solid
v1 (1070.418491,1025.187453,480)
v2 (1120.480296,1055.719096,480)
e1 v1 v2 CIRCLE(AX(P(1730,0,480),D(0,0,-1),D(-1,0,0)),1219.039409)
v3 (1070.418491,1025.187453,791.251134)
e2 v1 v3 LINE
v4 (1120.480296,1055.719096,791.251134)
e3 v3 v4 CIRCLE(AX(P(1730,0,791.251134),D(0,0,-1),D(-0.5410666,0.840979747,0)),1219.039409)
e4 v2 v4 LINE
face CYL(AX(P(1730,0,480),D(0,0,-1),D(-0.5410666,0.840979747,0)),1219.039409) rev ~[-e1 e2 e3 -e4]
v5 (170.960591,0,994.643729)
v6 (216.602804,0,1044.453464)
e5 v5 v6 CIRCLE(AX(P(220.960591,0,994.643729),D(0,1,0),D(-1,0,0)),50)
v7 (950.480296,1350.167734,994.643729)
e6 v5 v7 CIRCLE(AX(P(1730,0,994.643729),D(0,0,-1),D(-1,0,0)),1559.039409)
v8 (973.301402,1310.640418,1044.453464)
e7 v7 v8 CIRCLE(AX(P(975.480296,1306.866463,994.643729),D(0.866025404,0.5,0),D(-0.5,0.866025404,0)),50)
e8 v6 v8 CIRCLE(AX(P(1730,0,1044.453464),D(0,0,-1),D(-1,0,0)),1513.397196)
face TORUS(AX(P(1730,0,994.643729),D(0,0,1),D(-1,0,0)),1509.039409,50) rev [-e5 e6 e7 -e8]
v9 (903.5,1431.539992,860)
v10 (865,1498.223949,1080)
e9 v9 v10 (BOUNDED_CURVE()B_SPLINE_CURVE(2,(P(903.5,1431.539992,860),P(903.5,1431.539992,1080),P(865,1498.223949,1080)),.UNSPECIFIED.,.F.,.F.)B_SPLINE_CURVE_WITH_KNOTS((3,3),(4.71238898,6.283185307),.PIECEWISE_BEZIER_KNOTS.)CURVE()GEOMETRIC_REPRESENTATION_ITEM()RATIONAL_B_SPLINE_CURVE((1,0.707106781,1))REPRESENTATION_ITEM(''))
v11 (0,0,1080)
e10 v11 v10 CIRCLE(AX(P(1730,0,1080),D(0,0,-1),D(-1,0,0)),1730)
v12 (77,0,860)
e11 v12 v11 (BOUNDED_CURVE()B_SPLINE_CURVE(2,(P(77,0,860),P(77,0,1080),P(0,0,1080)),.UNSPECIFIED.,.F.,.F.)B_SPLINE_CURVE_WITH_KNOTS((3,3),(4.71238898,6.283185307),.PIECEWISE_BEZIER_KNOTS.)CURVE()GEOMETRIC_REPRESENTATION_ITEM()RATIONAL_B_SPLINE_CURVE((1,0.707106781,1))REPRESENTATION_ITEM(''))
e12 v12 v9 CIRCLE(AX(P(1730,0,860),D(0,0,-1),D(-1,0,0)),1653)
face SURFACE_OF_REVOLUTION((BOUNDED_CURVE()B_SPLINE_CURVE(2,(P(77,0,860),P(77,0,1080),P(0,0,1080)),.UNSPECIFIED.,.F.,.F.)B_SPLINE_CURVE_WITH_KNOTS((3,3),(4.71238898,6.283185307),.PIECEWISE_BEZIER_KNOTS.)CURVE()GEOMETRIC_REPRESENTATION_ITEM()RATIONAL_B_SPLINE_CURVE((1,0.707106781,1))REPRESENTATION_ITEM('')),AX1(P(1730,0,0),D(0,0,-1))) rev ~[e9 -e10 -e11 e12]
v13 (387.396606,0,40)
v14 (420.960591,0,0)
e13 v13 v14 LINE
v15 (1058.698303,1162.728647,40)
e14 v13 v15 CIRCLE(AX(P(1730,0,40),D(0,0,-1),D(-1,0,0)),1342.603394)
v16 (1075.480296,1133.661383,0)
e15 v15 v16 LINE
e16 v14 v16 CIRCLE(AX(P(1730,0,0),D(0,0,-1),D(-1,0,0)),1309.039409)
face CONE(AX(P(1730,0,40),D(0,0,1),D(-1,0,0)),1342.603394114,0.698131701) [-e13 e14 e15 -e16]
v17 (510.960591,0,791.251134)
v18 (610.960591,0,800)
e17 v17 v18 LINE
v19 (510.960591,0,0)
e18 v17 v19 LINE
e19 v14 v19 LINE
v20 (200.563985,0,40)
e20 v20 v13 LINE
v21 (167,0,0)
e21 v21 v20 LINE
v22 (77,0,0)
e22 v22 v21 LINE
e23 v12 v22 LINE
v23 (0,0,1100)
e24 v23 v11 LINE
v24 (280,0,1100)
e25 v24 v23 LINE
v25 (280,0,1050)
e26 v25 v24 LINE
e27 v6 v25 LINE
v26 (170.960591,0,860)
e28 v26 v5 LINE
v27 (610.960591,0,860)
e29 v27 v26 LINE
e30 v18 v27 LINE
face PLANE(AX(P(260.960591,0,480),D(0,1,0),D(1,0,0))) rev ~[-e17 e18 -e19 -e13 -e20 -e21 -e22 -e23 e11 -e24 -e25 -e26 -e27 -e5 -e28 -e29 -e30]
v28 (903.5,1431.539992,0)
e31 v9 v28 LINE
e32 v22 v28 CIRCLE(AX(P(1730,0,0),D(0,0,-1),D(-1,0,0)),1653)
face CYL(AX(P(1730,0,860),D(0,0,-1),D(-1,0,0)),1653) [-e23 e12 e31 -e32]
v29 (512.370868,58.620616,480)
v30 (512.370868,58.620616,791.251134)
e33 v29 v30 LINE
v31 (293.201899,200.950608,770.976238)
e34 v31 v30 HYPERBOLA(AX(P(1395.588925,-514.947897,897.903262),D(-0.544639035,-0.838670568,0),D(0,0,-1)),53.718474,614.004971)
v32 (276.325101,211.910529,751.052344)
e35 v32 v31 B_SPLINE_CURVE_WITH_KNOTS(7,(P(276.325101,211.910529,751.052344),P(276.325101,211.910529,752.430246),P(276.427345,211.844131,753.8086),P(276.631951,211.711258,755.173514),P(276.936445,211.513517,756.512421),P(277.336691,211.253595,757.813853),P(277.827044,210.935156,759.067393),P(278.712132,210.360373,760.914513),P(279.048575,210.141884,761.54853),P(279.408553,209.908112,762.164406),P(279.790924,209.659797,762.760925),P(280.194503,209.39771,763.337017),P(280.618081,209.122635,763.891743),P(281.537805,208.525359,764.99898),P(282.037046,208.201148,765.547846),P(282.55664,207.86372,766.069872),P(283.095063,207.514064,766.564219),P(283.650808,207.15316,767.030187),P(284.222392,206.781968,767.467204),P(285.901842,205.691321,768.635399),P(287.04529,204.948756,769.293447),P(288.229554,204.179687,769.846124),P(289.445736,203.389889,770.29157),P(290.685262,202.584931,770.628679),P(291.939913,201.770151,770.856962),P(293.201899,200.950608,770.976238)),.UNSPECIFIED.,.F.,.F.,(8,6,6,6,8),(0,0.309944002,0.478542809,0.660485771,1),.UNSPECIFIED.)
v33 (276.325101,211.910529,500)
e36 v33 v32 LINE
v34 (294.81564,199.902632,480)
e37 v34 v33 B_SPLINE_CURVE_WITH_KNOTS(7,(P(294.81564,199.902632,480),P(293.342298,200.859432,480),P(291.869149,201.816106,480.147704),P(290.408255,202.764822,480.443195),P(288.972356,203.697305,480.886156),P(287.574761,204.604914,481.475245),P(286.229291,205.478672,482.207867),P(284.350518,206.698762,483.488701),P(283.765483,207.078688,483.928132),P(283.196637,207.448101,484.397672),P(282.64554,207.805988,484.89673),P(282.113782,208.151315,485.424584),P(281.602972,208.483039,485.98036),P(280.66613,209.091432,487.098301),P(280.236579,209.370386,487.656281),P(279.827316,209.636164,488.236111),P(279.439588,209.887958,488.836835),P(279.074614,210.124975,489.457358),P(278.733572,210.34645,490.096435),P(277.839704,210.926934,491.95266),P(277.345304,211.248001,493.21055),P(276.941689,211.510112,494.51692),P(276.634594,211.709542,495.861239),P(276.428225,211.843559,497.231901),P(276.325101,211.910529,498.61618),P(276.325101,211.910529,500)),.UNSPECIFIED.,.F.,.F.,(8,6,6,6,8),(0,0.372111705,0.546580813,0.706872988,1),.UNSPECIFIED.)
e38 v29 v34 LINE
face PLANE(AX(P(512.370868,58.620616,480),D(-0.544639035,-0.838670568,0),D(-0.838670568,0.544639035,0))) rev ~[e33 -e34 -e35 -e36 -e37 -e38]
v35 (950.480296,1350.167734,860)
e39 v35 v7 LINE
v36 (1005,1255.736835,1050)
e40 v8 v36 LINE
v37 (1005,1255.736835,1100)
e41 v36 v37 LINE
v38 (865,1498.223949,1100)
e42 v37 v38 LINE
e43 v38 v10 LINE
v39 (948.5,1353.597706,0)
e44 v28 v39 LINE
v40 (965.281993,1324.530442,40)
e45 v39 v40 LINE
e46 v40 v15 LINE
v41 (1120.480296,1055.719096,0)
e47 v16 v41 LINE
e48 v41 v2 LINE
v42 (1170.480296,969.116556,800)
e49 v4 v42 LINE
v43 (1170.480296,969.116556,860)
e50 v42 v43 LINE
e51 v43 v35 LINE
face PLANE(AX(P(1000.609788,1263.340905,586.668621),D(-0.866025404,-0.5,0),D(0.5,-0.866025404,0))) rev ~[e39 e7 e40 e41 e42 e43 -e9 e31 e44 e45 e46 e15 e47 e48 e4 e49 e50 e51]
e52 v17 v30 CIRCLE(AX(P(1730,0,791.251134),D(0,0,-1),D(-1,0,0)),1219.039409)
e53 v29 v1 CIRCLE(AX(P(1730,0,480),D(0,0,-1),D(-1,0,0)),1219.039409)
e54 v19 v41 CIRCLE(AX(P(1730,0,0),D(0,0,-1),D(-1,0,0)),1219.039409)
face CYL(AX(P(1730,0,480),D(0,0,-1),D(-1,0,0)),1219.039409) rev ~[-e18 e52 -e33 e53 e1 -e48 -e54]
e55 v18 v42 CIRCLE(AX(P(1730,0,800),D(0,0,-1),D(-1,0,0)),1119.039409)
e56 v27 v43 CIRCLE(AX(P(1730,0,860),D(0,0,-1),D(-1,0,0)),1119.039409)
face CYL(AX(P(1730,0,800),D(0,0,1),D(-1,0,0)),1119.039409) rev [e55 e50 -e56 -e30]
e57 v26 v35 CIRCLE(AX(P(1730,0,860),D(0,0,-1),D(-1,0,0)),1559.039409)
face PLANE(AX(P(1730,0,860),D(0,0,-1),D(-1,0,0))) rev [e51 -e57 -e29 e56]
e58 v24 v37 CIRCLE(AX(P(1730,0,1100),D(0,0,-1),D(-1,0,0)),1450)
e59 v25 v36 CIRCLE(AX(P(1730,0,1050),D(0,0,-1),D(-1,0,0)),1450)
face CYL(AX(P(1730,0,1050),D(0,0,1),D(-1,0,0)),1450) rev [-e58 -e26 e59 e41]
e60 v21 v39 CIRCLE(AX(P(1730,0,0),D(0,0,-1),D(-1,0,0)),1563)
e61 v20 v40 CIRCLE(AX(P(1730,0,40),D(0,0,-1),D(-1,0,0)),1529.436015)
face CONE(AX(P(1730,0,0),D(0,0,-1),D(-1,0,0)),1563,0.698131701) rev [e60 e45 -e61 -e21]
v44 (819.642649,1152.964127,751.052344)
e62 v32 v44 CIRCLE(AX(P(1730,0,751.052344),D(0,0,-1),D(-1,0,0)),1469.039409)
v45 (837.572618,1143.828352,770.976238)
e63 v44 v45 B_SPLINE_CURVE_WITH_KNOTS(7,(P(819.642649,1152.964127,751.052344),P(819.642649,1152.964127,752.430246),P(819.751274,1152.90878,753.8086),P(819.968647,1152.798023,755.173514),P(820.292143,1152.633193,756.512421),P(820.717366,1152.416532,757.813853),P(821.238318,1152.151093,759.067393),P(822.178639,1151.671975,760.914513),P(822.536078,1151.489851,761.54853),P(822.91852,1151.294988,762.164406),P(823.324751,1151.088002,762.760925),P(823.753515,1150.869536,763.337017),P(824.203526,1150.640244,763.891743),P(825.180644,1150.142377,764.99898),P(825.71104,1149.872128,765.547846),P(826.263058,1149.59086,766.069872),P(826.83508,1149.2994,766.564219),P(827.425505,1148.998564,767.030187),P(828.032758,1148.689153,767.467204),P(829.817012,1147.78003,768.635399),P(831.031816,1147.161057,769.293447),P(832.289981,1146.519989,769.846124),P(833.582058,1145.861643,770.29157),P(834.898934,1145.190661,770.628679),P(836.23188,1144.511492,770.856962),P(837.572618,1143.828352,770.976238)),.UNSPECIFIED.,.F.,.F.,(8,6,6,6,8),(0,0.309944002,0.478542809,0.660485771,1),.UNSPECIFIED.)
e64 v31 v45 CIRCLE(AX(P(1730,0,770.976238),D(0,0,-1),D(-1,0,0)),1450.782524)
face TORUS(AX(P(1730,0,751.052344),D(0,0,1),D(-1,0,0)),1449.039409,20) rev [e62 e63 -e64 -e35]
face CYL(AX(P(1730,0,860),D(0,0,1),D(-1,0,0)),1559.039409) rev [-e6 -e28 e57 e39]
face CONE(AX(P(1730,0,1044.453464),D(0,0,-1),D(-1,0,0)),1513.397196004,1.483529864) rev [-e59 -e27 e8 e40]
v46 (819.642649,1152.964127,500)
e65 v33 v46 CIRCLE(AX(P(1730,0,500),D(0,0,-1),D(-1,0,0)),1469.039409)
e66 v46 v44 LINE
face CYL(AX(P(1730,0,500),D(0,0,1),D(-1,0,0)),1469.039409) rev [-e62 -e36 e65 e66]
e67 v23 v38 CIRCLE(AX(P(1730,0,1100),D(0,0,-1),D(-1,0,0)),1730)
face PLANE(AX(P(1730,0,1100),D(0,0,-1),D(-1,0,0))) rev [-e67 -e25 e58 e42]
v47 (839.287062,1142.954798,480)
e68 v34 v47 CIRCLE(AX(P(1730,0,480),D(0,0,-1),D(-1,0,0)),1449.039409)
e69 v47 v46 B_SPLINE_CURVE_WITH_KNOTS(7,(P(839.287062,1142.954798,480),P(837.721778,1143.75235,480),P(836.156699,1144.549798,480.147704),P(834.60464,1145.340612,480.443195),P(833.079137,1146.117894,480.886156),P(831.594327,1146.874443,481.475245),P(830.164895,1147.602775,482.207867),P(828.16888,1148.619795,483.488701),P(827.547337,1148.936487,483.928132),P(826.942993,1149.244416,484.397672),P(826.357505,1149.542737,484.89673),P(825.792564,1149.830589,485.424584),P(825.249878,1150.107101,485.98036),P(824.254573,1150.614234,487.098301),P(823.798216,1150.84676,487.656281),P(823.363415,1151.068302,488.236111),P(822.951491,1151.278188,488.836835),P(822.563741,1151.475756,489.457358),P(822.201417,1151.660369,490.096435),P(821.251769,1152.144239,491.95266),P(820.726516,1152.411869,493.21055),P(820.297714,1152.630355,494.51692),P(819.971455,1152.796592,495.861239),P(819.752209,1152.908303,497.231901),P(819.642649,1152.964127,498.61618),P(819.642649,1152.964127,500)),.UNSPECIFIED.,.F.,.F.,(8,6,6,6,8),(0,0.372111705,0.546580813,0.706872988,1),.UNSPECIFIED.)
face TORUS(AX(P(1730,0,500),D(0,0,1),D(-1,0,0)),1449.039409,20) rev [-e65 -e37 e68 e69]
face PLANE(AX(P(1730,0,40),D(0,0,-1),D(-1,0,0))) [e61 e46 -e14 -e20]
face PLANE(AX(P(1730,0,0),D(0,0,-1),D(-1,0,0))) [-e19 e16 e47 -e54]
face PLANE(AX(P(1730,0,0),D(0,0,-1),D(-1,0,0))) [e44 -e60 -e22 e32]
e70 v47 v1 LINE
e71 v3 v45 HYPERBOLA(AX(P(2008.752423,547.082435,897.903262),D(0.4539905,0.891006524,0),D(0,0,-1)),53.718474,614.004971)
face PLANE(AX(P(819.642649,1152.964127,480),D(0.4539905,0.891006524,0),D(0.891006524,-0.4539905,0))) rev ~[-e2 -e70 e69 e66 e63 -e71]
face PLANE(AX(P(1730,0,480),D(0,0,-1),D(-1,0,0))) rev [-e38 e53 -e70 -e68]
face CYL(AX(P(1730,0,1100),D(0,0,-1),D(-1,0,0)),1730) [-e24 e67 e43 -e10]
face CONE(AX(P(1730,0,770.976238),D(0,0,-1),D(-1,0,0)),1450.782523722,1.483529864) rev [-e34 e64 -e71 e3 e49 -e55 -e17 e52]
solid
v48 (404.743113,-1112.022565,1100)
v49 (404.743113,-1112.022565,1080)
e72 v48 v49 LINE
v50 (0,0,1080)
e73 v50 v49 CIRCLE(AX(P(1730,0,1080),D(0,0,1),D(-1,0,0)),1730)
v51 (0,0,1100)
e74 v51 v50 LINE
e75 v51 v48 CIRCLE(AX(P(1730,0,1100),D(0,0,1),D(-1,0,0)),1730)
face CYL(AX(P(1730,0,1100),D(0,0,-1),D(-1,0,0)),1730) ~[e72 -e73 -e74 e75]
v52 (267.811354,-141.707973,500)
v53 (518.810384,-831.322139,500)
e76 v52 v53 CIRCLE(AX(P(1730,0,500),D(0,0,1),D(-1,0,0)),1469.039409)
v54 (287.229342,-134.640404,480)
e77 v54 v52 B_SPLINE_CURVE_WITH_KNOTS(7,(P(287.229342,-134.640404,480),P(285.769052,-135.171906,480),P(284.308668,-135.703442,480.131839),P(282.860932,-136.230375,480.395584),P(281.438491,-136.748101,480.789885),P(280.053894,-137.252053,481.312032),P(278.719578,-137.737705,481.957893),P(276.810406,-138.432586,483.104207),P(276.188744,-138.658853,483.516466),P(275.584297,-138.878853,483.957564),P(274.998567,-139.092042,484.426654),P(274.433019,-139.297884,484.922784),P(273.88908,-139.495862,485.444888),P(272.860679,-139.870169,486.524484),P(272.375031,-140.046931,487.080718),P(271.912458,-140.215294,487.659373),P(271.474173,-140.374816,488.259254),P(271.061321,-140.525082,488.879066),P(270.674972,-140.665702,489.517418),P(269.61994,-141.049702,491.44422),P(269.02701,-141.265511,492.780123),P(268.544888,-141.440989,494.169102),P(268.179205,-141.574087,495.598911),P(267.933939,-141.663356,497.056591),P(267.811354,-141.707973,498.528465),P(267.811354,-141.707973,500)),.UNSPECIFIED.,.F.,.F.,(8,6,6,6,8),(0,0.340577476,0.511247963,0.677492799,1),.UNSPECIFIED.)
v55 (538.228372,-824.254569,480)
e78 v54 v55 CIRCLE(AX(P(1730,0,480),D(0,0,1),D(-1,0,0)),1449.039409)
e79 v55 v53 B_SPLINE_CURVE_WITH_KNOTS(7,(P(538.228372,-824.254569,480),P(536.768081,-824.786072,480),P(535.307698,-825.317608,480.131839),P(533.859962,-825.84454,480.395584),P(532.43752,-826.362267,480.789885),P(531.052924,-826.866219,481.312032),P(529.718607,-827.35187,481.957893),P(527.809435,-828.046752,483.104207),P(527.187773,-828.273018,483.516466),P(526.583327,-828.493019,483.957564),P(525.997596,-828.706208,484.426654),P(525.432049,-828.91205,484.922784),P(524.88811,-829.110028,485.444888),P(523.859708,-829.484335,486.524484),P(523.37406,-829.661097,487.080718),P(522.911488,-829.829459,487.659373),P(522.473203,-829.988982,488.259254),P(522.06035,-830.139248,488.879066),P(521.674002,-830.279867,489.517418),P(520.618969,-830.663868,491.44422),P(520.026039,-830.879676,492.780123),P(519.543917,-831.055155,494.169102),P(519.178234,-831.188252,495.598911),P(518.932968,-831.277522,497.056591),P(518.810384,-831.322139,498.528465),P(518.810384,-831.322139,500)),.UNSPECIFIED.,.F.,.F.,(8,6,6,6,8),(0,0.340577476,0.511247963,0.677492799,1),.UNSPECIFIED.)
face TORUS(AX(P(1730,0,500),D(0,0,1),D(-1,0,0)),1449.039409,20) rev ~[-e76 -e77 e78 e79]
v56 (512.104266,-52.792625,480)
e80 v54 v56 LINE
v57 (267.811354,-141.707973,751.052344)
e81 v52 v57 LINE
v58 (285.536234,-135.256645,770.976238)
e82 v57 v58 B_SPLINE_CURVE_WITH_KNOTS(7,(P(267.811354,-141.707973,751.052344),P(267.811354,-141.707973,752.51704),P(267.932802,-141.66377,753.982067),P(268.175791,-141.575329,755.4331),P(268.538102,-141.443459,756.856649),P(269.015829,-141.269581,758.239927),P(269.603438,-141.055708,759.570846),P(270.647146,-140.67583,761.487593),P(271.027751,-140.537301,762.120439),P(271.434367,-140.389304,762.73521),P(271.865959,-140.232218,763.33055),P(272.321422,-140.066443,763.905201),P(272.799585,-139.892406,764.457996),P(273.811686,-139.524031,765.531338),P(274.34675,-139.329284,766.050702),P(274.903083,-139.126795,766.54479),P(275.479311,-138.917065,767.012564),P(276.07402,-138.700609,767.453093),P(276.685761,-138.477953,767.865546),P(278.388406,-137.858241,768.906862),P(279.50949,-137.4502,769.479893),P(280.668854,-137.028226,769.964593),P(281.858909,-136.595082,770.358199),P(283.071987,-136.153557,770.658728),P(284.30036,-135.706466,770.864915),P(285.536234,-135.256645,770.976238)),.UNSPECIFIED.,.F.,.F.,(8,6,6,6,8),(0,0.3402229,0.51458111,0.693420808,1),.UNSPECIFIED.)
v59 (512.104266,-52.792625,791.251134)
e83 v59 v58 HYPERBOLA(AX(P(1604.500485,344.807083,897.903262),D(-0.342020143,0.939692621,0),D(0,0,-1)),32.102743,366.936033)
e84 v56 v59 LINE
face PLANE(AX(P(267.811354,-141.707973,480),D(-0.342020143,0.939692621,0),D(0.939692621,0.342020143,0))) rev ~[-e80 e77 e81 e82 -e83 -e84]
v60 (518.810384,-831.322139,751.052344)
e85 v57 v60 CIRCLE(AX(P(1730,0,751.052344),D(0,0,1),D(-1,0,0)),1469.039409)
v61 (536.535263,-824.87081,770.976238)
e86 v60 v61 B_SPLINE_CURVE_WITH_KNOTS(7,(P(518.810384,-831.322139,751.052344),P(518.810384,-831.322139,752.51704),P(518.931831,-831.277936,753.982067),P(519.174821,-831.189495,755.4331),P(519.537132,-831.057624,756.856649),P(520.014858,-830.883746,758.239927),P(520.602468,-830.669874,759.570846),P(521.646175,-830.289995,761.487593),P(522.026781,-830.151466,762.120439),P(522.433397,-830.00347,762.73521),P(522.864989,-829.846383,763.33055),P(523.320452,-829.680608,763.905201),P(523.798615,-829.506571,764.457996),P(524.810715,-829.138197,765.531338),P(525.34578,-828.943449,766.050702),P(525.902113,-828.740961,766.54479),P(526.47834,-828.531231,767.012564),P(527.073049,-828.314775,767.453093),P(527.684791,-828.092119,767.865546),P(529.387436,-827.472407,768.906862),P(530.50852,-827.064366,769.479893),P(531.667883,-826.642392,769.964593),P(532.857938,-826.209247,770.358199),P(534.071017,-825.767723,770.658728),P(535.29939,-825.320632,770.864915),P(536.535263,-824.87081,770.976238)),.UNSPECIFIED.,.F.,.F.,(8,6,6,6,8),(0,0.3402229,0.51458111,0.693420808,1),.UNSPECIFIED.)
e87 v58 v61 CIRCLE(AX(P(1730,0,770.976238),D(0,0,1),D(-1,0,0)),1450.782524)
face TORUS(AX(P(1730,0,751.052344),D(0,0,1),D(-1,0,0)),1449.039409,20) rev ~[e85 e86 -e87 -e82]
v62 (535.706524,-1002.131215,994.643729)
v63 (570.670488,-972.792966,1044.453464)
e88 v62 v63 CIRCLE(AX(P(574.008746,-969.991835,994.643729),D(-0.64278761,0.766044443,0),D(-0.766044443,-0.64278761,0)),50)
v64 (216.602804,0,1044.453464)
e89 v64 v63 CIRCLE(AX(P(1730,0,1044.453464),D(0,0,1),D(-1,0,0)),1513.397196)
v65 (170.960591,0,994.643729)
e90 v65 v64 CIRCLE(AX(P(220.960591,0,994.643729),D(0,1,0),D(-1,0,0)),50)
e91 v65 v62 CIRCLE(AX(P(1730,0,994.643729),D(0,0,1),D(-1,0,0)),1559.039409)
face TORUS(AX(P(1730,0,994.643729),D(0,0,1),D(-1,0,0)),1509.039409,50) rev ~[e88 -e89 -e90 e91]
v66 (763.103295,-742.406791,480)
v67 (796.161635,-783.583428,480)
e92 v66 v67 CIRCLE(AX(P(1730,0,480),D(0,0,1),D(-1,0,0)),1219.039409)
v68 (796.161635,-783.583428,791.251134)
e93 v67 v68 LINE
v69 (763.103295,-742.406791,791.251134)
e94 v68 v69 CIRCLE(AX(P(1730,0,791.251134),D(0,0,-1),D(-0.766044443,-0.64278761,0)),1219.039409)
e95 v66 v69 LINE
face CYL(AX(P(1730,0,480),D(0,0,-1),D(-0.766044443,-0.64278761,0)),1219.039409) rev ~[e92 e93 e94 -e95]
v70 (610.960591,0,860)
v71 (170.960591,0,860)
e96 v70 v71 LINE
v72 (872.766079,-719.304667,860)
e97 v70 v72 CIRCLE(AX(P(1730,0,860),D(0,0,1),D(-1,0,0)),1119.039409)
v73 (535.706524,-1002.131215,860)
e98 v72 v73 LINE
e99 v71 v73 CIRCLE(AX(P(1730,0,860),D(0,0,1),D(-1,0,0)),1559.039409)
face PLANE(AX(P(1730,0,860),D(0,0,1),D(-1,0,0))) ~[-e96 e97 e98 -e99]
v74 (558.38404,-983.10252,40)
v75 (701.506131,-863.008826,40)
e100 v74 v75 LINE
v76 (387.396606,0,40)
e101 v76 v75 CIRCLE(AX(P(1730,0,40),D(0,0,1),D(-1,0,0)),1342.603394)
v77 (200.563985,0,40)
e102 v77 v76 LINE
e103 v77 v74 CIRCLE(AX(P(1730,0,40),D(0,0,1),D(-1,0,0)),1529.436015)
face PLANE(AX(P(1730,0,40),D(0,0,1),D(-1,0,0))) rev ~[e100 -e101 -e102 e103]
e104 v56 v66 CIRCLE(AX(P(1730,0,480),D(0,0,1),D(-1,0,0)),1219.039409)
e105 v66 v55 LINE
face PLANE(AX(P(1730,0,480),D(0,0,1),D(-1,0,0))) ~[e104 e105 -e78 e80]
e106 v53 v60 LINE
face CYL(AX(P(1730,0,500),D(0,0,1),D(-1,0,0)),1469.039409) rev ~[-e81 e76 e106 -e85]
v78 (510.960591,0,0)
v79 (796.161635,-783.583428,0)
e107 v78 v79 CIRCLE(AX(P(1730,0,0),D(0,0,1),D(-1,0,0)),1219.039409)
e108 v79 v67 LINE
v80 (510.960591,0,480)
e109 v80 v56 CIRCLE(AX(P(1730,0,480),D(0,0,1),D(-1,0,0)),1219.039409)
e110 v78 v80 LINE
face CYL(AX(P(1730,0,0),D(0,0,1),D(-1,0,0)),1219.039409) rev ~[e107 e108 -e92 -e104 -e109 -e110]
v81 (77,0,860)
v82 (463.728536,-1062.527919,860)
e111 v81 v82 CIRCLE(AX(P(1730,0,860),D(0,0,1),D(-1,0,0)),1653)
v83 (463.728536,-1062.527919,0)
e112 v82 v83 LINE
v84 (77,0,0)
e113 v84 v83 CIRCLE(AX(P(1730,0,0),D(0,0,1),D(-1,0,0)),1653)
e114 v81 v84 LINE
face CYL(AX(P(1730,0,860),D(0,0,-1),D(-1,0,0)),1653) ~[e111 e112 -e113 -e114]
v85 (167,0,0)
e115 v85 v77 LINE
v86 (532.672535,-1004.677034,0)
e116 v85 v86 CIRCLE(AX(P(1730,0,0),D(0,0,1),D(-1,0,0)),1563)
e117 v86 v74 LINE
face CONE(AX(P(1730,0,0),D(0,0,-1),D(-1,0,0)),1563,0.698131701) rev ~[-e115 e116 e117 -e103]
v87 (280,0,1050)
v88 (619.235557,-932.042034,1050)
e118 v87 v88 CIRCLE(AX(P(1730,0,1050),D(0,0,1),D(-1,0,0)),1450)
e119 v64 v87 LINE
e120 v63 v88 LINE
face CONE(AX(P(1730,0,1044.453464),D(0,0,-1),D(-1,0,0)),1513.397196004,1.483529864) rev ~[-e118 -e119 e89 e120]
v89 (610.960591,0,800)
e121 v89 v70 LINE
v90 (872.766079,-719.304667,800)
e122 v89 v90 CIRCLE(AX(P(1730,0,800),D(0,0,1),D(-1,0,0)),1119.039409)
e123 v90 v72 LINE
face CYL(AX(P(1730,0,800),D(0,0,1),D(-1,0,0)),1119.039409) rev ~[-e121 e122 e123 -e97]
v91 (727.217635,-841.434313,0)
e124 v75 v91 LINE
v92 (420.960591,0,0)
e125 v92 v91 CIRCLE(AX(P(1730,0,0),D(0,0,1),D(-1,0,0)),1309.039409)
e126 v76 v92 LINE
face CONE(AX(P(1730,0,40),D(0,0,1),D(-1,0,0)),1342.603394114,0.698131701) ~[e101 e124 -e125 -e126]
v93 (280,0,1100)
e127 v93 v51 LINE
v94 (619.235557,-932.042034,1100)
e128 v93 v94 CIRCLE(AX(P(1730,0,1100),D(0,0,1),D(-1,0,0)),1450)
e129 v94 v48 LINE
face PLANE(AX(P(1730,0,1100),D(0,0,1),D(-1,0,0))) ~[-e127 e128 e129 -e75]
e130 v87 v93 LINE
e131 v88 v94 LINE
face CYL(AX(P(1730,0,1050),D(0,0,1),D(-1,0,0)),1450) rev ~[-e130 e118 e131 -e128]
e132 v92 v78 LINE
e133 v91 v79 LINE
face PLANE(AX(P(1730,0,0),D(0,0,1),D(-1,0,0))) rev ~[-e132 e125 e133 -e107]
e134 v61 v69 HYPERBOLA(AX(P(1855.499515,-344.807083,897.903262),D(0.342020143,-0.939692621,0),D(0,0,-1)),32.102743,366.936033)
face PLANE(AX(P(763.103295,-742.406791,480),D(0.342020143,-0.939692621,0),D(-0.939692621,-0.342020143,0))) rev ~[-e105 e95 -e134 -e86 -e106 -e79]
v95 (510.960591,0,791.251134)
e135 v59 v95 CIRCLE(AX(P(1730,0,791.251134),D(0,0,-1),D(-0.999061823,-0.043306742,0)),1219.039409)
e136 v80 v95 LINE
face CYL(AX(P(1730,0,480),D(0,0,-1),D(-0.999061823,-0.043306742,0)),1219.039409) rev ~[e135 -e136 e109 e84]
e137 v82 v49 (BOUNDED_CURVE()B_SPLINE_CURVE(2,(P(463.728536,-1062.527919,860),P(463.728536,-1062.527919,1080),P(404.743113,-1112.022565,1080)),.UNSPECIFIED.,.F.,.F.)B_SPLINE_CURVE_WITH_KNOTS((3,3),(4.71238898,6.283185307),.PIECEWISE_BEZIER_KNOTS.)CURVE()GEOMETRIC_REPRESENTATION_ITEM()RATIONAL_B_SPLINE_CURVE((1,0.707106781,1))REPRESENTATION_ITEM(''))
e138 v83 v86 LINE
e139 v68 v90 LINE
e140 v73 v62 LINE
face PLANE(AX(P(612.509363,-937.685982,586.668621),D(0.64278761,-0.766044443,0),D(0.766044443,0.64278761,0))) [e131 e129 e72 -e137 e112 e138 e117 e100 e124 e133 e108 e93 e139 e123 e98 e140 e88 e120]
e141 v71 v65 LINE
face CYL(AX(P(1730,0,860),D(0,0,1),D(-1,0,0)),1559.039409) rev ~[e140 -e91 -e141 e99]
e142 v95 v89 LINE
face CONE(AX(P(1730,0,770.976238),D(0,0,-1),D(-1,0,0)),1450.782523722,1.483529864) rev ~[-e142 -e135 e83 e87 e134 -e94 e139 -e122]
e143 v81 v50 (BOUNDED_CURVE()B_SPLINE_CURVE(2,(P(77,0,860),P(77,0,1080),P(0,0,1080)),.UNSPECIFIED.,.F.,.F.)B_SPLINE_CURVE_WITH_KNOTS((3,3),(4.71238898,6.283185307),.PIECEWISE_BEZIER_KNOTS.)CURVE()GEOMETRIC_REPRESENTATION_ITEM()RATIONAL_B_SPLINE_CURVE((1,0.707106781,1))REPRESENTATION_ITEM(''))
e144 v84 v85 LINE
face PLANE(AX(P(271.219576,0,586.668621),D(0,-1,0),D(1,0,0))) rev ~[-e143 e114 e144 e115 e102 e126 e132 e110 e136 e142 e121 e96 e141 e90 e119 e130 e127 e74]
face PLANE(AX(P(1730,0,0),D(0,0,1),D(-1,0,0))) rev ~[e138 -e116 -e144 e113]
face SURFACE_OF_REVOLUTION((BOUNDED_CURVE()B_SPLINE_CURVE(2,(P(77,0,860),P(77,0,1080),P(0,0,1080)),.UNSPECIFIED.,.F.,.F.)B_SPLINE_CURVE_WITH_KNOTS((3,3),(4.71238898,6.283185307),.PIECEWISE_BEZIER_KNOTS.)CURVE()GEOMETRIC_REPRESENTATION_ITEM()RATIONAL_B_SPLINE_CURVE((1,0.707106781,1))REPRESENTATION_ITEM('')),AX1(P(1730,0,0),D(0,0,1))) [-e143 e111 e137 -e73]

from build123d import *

# Parameters (mm, degrees)
F2_ANGLE = 60
F5_DEPTH = 311.2511336474
F6_ANGLE = 40
F8_DEPTH = 311.2511336474


with BuildPart() as f2:
    # F0 (on Front) → F2 (revolve)
    with BuildSketch(Plane.XZ):
        with BuildLine():
            Line((77, 860), (77, 0))
            Line((77, 0), (167, 0))
            Line((167, 0), (200.5639852471, 40))
            Line((200.5639852471, 40), (387.3966058859, 40))
            Line((387.3966058859, 40), (420.960591133, 0))
            Line((420.960591133, 0), (510.960591133, 0))
            Line((510.960591133, 0), (510.960591133, 480))
            Line((510.960591133, 480), (280.960591133, 480))
            ThreePointArc((280.960591133, 480), (266.8184555093, 485.8578643763), (260.960591133, 500))
            Line((260.960591133, 500), (260.960591133, 751.0523442856))
            ThreePointArc((260.960591133, 751.0523442856), (266.2150443968, 764.5641484379), (279.2174762781, 770.9762382474))
            Line((279.2174762781, 770.9762382474), (610.960591133, 800))
            Line((610.960591133, 800), (610.960591133, 860))
            Line((610.960591133, 860), (170.960591133, 860))
            Line((170.960591133, 860), (170.960591133, 994.6437291457))
            ThreePointArc((170.960591133, 994.6437291457), (184.0967242925, 1028.4232395265), (216.6028039956, 1044.4534640503))
            Line((216.6028039956, 1044.4534640503), (280, 1050))
            Line((280, 1050), (280, 1100))
            Line((280, 1100), (0, 1100))
            Line((0, 1100), (0, 1080))
            add(Edge.make_bspline(
                [(77, 860), (77, 1080), (0, 1080)],
                knots=[4.7123889804, 4.7123889804, 4.7123889804, 6.2831853072, 6.2831853072, 6.2831853072], degree=2, weights=[1, 0.7071067812, 1]))
        make_face()
    revolve(axis=Axis((1730, 0, 0), (0, 0, -1)), revolution_arc=F2_ANGLE)

    # F4 (on face) → F5 (join, through all)
    with BuildSketch(Plane.XY.offset(480)):
        with BuildLine():
            ThreePointArc((510.960591133, 0), (511.3132112784, 29.3187886209), (512.3708677163, 58.6206156975))
            Line((512.3708677163, 58.6206156975), (276.3251008291, 211.9105290561))
            ThreePointArc((276.3251008291, 211.9105290561), (264.8067534678, 106.2333992714), (260.960591133, 0))
            Line((260.960591133, 0), (510.960591133, 0))
        make_face()
        with BuildLine():
            Line((819.6426489226, 1152.9641269977), (1070.4184914786, 1025.187453097))
            ThreePointArc((1070.4184914786, 1025.187453097), (1095.2657898853, 1040.7543239789), (1120.4802955665, 1055.7190962932))
            Line((1120.4802955665, 1055.7190962932), (995.4802955665, 1272.2254472393))
            ThreePointArc((995.4802955665, 1272.2254472393), (905.4025542345, 1215.7778733146), (819.6426489226, 1152.9641269977))
        make_face()
    extrude(amount=F5_DEPTH)


with BuildPart() as f6:
    # F0 (on Front) → F6 (revolve)
    with BuildSketch(Plane.XZ):
        with BuildLine():
            Line((77, 860), (77, 0))
            Line((77, 0), (167, 0))
            Line((167, 0), (200.5639852471, 40))
            Line((200.5639852471, 40), (387.3966058859, 40))
            Line((387.3966058859, 40), (420.960591133, 0))
            Line((420.960591133, 0), (510.960591133, 0))
            Line((510.960591133, 0), (510.960591133, 480))
            Line((510.960591133, 480), (280.960591133, 480))
            ThreePointArc((280.960591133, 480), (266.8184555093, 485.8578643763), (260.960591133, 500))
            Line((260.960591133, 500), (260.960591133, 751.0523442856))
            ThreePointArc((260.960591133, 751.0523442856), (266.2150443968, 764.5641484379), (279.2174762781, 770.9762382474))
            Line((279.2174762781, 770.9762382474), (610.960591133, 800))
            Line((610.960591133, 800), (610.960591133, 860))
            Line((610.960591133, 860), (170.960591133, 860))
            Line((170.960591133, 860), (170.960591133, 994.6437291457))
            ThreePointArc((170.960591133, 994.6437291457), (184.0967242925, 1028.4232395265), (216.6028039956, 1044.4534640503))
            Line((216.6028039956, 1044.4534640503), (280, 1050))
            Line((280, 1050), (280, 1100))
            Line((280, 1100), (0, 1100))
            Line((0, 1100), (0, 1080))
            add(Edge.make_bspline(
                [(77, 860), (77, 1080), (0, 1080)],
                knots=[4.7123889804, 4.7123889804, 4.7123889804, 6.2831853072, 6.2831853072, 6.2831853072], degree=2, weights=[1, 0.7071067812, 1]))
        make_face()
    revolve(axis=Axis((1730, 0, 0), (0, 0, 1)), revolution_arc=F6_ANGLE)

    # F7 (on face) → F8 (join, through all)
    with BuildSketch(Plane.XY.offset(480)):
        with BuildLine():
            ThreePointArc((518.8103838976, -831.3221389148), (560.36603147, -888.838098005), (604.6505241146, -944.2803301609))
            Line((604.6505241146, -944.2803301609), (796.1616348944, -783.5834277393))
            ThreePointArc((796.1616348944, -783.5834277393), (779.4094834165, -763.1741283301), (763.1032953401, -742.4067907075))
            Line((763.1032953401, -742.4067907075), (518.8103838976, -831.3221389148))
        make_face()
        with BuildLine():
            Line((267.8113544688, -141.7079732541), (512.1042659113, -52.7926250468))
            ThreePointArc((512.1042659113, -52.7926250468), (511.2465433657, -26.4025058059), (510.960591133, 0))
            Line((510.960591133, 0), (260.960591133, 0))
            ThreePointArc((260.960591133, 0), (262.6742815095, -70.9367370304), (267.8113544688, -141.7079732541))
        make_face()
    extrude(amount=F8_DEPTH)


solid = Compound([f2.part, f6.part])
